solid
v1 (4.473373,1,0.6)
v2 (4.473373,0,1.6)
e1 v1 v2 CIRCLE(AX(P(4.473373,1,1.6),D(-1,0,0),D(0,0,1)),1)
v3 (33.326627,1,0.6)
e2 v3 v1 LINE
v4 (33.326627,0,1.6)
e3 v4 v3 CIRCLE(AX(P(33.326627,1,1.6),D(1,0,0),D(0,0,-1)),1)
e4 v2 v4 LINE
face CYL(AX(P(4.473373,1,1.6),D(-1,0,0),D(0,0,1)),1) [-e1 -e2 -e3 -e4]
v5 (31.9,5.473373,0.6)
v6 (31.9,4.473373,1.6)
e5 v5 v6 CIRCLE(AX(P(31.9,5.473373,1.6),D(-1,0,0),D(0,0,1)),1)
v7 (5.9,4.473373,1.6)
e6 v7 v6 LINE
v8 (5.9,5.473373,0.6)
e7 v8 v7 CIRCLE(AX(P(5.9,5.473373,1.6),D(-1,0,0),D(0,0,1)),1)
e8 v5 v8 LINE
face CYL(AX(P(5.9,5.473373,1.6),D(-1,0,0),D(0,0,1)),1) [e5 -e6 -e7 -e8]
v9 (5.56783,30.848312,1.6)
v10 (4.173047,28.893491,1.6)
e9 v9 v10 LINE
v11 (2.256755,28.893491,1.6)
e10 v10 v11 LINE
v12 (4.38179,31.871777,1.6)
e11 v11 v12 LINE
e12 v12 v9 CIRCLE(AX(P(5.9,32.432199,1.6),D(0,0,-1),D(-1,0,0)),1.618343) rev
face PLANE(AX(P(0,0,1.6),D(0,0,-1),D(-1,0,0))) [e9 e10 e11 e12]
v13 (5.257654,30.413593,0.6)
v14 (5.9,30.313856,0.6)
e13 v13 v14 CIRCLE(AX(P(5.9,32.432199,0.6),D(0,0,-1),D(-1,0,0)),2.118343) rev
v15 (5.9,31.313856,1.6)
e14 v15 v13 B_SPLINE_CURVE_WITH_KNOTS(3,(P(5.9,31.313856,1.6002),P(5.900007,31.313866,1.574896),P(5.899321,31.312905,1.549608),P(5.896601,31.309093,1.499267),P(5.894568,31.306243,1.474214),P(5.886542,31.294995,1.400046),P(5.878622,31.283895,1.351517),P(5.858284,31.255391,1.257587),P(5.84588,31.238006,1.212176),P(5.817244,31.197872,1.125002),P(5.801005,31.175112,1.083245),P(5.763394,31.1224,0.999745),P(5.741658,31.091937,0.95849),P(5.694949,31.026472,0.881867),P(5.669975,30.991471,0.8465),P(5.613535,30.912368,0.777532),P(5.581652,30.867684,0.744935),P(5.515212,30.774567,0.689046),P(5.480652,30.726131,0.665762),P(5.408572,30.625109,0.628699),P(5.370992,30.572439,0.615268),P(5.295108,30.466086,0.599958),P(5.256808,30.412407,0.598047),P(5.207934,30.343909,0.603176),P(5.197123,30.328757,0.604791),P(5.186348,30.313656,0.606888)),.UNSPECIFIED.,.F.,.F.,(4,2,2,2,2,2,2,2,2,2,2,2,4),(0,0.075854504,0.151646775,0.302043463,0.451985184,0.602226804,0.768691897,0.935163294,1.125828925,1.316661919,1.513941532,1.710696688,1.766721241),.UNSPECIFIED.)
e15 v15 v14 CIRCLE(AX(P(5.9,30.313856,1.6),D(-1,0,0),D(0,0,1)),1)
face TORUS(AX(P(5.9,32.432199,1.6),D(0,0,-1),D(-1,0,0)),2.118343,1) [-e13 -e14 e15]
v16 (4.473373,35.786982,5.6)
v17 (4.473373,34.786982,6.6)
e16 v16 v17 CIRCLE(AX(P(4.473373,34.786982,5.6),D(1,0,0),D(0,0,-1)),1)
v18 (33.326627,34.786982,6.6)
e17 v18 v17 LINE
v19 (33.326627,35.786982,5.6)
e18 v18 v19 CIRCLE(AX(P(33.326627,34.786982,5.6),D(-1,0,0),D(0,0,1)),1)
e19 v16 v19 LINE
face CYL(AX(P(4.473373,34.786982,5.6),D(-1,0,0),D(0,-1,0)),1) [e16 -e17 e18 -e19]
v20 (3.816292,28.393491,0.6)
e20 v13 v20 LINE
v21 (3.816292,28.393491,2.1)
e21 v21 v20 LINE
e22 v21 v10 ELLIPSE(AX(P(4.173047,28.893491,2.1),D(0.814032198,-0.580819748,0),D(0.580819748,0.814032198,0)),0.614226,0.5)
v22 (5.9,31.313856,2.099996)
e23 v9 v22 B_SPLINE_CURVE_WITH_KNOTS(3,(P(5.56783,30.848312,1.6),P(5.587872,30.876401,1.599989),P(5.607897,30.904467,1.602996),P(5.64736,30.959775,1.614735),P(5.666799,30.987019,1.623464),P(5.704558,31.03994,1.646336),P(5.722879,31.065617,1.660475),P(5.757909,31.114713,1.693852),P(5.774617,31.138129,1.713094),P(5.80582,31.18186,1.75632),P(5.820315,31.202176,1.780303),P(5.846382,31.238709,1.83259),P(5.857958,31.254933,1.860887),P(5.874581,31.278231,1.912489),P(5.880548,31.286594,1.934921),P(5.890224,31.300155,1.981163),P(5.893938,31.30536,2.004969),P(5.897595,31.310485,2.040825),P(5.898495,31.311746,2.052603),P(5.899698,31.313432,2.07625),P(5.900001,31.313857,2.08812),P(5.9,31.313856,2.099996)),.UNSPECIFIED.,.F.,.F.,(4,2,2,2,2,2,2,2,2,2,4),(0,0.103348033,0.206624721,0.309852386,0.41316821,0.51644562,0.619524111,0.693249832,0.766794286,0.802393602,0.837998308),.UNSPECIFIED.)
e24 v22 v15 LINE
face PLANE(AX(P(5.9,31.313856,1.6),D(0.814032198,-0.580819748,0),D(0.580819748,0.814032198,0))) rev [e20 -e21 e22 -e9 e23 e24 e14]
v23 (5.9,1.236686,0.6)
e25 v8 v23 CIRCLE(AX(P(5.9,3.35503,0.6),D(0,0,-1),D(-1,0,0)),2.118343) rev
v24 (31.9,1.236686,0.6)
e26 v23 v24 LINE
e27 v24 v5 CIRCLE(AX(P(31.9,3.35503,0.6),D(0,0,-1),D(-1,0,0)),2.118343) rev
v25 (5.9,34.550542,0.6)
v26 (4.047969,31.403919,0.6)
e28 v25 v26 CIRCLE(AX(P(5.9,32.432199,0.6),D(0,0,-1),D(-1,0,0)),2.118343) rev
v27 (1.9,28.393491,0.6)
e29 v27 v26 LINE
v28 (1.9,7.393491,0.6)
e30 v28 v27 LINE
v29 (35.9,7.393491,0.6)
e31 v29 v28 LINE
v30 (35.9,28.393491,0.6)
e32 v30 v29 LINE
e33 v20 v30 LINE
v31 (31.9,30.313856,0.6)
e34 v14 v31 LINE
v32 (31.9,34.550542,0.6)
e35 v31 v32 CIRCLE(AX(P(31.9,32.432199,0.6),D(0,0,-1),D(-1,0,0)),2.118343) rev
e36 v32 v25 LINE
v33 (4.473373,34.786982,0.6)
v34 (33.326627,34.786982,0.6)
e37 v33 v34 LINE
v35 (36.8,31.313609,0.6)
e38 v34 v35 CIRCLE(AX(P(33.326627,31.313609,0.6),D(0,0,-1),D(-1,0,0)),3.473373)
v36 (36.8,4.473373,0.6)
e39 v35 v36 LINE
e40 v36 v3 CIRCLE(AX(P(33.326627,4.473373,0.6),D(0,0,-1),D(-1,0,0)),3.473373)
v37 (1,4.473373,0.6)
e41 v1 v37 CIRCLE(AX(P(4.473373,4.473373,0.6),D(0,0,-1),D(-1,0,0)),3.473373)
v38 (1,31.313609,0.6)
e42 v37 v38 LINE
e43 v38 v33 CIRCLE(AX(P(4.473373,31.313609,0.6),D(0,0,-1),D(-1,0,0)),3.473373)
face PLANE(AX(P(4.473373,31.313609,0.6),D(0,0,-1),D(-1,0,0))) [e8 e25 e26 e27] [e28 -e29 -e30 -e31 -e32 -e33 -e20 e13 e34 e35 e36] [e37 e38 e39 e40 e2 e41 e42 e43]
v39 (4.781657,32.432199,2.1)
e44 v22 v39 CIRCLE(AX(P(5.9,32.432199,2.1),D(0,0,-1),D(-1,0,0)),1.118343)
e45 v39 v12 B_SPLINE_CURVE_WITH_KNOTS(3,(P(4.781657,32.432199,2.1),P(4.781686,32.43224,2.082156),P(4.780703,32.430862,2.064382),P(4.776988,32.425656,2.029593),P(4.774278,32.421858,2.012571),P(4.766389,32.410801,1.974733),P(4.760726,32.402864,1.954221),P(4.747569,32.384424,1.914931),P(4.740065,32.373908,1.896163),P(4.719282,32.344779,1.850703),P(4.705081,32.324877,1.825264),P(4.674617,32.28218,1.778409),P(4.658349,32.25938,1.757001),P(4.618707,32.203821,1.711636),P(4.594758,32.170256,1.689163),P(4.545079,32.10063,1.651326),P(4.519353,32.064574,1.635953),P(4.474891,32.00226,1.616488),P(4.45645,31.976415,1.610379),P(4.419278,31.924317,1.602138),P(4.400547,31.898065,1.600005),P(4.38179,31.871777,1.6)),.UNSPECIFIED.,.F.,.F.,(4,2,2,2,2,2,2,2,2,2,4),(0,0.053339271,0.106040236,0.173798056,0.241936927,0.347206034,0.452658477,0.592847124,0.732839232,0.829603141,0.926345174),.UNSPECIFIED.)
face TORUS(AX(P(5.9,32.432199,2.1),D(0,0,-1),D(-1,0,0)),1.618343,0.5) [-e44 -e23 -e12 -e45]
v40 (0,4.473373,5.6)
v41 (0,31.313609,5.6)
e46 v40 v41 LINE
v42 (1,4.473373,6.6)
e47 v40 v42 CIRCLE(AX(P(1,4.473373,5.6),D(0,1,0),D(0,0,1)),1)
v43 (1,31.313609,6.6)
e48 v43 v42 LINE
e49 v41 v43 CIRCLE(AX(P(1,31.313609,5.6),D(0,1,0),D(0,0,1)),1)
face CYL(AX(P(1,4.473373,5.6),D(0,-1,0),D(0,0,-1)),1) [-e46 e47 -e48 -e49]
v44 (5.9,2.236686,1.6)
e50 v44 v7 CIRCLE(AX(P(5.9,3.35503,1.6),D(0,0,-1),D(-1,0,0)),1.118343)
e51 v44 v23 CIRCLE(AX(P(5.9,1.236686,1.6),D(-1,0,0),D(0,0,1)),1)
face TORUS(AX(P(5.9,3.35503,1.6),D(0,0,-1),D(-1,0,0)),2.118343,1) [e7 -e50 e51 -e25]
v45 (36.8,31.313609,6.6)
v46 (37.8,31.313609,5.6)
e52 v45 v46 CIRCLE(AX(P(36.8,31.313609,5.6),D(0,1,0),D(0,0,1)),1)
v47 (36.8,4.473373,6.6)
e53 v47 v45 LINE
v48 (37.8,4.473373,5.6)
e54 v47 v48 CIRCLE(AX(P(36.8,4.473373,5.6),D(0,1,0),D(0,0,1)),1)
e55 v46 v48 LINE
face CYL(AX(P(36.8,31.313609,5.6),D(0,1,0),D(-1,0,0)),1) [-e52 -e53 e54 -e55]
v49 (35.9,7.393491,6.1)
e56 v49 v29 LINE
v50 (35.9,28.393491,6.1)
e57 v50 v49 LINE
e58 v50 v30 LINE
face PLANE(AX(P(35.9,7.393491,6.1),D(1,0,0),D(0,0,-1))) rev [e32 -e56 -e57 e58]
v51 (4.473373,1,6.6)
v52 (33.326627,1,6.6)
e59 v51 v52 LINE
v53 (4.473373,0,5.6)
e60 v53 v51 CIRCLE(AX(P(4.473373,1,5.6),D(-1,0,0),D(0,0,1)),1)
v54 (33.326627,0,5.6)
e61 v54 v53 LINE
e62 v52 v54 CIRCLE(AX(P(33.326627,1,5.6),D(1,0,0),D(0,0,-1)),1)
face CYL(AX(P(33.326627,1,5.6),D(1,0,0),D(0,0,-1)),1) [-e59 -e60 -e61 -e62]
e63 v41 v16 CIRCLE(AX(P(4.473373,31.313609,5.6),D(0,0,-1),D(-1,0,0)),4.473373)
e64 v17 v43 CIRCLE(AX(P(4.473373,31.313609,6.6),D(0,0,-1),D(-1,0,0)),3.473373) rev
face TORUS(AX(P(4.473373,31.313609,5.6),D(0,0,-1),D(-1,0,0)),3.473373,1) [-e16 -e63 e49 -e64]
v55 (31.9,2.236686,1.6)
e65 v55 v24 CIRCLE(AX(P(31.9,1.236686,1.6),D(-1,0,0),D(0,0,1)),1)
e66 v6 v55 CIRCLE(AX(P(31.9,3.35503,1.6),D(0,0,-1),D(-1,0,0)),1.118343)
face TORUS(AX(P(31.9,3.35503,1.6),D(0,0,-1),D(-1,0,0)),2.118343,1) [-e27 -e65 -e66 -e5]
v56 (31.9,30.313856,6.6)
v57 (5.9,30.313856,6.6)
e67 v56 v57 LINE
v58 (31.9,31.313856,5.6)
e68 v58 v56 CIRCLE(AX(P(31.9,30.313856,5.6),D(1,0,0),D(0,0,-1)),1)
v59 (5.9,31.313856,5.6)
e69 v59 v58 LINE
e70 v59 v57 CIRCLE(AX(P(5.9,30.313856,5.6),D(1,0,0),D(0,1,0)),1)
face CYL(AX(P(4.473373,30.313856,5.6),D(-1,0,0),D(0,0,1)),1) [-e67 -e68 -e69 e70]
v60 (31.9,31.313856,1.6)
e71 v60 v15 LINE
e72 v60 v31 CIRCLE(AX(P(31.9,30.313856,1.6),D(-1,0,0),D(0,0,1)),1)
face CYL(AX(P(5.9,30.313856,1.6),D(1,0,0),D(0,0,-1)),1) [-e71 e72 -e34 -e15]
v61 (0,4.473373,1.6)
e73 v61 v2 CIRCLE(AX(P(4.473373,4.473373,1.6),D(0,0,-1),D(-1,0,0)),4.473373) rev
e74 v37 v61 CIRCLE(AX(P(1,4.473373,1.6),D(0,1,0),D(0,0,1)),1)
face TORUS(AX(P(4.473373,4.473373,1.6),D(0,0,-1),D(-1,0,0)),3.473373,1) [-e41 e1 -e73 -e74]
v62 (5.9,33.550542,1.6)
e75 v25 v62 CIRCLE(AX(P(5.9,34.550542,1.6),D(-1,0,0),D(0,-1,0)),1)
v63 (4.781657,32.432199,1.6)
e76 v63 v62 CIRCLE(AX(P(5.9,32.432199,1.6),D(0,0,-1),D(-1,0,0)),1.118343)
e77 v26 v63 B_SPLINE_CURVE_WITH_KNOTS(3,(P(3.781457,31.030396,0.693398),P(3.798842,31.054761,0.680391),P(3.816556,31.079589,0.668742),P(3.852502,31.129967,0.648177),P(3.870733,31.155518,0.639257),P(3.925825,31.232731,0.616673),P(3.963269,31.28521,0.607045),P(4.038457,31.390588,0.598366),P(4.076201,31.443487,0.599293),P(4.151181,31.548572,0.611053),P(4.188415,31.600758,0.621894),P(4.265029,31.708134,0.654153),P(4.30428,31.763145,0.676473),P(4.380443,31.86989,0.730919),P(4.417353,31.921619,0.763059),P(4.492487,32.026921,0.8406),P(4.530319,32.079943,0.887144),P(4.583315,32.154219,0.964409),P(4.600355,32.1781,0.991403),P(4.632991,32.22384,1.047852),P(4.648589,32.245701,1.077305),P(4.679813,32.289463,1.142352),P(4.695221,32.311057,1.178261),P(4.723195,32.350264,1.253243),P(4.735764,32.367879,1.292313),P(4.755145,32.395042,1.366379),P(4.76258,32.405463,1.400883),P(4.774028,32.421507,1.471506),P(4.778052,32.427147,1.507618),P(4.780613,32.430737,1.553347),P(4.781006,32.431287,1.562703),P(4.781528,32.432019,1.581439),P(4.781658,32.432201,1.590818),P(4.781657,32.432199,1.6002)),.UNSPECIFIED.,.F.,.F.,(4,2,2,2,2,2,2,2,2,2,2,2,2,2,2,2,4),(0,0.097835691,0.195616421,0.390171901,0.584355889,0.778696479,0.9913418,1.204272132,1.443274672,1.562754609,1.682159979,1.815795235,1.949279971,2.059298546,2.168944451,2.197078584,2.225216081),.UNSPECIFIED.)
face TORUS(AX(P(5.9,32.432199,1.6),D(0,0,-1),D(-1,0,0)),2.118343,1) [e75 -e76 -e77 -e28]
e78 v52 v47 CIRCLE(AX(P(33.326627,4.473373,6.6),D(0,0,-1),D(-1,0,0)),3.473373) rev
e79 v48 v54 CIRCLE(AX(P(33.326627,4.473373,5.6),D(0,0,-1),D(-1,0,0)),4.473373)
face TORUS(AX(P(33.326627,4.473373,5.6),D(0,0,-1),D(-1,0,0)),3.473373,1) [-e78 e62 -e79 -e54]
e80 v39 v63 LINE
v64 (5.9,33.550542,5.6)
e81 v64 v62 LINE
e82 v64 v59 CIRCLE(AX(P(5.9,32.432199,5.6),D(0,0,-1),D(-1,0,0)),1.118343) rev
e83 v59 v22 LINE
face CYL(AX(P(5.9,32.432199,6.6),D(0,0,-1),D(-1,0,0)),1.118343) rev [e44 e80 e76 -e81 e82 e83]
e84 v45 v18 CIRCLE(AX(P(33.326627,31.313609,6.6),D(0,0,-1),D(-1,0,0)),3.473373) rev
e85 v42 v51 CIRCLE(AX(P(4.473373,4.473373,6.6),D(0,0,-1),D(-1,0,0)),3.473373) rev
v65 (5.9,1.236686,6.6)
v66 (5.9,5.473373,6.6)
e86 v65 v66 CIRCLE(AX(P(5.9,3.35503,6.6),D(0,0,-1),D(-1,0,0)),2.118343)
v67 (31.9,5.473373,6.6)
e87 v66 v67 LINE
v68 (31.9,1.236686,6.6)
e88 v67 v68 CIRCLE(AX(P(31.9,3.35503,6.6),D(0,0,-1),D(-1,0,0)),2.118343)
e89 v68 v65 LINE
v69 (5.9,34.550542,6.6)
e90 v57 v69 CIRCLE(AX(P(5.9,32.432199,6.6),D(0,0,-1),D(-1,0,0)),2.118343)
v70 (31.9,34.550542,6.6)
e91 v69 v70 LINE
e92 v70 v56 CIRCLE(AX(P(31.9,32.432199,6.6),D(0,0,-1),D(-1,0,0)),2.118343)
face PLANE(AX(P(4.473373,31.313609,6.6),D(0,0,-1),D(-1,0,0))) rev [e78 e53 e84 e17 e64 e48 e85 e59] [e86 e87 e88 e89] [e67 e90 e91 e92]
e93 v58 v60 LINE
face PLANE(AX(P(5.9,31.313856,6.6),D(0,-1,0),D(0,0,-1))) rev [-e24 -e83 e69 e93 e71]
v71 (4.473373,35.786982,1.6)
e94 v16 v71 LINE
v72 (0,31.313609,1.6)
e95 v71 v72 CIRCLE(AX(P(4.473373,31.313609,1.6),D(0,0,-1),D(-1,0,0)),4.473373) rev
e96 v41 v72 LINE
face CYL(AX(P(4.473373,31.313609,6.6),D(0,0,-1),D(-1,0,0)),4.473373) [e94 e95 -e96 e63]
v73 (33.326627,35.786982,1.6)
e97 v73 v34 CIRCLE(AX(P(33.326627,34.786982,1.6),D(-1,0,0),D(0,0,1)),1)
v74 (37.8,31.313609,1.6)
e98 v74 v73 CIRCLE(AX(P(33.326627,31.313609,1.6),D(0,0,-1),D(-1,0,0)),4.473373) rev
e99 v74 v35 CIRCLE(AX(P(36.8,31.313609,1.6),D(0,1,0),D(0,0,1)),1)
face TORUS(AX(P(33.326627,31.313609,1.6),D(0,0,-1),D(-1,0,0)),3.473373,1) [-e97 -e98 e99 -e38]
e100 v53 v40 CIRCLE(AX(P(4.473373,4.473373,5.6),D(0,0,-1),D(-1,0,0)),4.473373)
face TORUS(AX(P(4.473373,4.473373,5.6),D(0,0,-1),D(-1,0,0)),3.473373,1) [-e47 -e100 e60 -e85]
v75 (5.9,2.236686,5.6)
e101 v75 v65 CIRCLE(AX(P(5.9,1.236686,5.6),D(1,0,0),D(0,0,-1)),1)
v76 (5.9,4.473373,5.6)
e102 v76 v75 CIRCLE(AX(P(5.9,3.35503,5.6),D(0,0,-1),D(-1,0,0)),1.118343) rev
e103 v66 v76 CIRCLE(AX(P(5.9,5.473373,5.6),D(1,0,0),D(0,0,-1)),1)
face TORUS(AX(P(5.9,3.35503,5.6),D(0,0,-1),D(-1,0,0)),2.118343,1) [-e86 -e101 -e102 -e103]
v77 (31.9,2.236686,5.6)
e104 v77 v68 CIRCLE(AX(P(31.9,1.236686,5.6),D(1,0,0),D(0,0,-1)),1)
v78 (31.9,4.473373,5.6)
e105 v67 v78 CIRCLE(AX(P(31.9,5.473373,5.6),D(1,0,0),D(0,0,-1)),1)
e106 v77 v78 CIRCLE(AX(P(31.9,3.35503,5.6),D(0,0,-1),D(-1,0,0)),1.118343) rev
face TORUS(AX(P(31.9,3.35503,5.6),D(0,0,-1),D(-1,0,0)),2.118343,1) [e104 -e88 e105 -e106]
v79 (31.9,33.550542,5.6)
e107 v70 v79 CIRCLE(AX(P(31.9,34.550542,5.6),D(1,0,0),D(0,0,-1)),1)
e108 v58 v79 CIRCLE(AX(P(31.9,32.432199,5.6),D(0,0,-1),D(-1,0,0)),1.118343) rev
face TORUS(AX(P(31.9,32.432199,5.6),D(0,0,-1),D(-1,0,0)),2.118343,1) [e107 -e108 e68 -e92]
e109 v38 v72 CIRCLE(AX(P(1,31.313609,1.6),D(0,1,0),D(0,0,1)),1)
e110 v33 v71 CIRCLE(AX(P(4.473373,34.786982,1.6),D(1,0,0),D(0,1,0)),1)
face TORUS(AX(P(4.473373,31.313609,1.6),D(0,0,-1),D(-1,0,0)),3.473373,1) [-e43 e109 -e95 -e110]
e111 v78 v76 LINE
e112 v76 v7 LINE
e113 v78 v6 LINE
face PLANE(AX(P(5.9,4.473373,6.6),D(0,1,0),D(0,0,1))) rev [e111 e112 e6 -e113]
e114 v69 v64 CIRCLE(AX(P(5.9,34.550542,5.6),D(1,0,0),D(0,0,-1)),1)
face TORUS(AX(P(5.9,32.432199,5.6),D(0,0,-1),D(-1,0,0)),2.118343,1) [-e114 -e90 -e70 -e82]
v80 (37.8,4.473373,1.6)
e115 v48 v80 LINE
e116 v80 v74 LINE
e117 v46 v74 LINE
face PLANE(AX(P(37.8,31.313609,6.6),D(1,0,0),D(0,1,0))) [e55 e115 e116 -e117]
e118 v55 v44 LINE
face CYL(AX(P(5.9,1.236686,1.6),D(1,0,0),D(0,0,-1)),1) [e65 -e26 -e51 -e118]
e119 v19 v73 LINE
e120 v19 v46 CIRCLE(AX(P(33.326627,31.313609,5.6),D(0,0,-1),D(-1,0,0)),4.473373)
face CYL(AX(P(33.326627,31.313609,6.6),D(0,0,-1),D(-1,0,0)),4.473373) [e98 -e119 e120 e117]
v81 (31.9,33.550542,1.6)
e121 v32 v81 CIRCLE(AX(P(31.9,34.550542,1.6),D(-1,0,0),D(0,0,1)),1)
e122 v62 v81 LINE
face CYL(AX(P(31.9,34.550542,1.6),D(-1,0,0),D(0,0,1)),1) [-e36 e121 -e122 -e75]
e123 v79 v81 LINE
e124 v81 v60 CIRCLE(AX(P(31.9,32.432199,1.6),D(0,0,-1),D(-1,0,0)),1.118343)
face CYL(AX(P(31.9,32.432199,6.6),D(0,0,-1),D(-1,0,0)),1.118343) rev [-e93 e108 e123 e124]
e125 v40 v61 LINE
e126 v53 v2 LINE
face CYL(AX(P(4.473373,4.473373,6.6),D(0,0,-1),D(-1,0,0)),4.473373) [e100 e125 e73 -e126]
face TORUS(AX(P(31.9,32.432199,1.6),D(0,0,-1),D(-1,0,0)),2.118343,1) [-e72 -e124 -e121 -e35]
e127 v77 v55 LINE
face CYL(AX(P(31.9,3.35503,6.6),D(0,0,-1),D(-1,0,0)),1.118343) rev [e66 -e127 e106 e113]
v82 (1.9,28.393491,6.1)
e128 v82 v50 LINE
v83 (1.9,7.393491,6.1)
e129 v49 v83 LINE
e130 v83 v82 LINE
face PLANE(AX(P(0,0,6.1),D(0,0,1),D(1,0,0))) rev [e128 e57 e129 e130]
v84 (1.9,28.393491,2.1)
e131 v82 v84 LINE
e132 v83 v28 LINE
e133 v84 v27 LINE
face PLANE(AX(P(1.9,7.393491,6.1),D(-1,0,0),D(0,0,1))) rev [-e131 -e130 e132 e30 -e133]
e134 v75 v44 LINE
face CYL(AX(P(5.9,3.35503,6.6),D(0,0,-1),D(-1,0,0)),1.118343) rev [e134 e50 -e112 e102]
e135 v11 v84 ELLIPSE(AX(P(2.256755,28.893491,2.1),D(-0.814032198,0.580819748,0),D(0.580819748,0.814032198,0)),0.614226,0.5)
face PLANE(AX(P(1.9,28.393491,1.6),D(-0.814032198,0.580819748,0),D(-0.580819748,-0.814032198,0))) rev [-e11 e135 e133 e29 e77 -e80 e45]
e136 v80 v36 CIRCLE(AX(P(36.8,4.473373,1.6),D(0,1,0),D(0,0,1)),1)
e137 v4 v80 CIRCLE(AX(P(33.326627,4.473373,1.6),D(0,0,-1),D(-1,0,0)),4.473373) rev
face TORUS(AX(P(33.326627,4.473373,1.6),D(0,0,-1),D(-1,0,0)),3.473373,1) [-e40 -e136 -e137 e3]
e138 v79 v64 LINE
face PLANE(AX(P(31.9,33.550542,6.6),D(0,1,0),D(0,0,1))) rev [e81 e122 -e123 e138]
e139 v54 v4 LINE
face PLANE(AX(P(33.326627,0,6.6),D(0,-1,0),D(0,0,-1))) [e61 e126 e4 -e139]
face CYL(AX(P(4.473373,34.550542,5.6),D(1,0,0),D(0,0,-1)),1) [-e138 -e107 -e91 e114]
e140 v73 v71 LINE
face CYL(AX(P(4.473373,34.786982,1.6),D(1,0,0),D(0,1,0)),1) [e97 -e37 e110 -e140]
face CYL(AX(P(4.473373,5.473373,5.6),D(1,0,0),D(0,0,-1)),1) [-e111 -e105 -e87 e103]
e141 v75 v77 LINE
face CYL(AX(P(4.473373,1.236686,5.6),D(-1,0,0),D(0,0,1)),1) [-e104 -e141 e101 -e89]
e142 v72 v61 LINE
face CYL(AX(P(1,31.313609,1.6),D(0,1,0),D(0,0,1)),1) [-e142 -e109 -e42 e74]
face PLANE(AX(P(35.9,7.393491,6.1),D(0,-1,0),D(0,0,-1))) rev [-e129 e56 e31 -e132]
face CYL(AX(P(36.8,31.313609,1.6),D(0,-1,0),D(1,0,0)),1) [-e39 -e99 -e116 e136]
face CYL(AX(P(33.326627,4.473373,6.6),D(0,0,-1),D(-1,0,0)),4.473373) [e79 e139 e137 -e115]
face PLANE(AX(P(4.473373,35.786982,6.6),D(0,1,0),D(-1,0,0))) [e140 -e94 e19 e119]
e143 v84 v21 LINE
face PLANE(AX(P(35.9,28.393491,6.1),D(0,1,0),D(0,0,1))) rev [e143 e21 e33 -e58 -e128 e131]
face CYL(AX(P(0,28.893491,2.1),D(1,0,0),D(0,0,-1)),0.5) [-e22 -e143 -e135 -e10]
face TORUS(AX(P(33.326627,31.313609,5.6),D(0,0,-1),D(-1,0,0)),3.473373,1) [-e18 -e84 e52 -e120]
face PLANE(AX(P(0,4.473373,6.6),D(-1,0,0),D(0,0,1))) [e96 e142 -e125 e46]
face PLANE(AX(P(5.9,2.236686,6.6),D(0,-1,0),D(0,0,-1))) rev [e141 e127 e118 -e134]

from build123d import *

# Parameters (mm, degrees)
BOSS_EXTRUDE1_DEPTH = 6
SKETCH2_W           = 34
SKETCH2_H           = 21
CUT_EXTRUDE1_DEPTH  = 5.5
FILLET1_R           = 1
CUT_EXTRUDE2_DEPTH  = 1
FILLET2_R           = 0.5


with BuildPart() as part:
    # Sketch1 → Boss-Extrude1 (new body)
    with BuildSketch(Plane(origin=(0, 0, 0.6), x_dir=(-1, 0, 0), z_dir=(0, 0, -1))):
        with BuildLine():
            Line((-4.473372781, 35.786982249), (-33.326627219, 35.786982249))
            ThreePointArc((-33.326627219, 35.786982249), (-36.489779447, 34.476761696), (-37.8, 31.313609467))
            Line((-37.8, 31.313609467), (-37.8, 4.473372781))
            ThreePointArc((-37.8, 4.473372781), (-36.489779447, 1.310220553), (-33.326627219, 0))
            Line((-33.326627219, 0), (-4.473372781, 0))
            ThreePointArc((-4.473372781, 0), (-1.310220553, 1.310220553), (0, 4.473372781))
            Line((0, 4.473372781), (0, 31.313609467))
            ThreePointArc((0, 31.313609467), (-1.310220553, 34.476761696), (-4.473372781, 35.786982249))
        make_face()
        with BuildLine():
            Line((-5.9, 4.473372781), (-31.9, 4.473372781))
            ThreePointArc((-31.9, 4.473372781), (-33.018343195, 3.355029586), (-31.9, 2.236686391))
            Line((-31.9, 2.236686391), (-5.9, 2.236686391))
            ThreePointArc((-5.9, 2.236686391), (-4.781656805, 3.355029586), (-5.9, 4.473372781))
        make_face(mode=Mode.SUBTRACT)
        with BuildLine():
            Line((-5.9, 31.31385603), (-31.9, 31.31385603))
            ThreePointArc((-31.9, 31.31385603), (-33.018343195, 32.432199225), (-31.9, 33.550542421))
            Line((-31.9, 33.550542421), (-5.9, 33.550542421))
            ThreePointArc((-5.9, 33.550542421), (-4.781656805, 32.432199225), (-5.9, 31.31385603))
        make_face(mode=Mode.SUBTRACT)
    extrude(amount=-BOSS_EXTRUDE1_DEPTH)

    # Sketch2 → Cut-Extrude1 (cut)
    with BuildSketch(Plane(origin=(0, 0, 0.6), x_dir=(-1, 0, 0), z_dir=(0, 0, -1))):
        with Locations((-18.9, 17.893491124)):
            Rectangle(SKETCH2_W, SKETCH2_H)
    extrude(amount=-CUT_EXTRUDE1_DEPTH, mode=Mode.SUBTRACT)

    # Fillet1
    fillet1_edges = [part.edges().sort_by_distance(p)[0] for p in [
        (36.489779447, 34.476761696, 6.6),
        (18.9, 35.786982249, 0.6),
        (1.310220553, 34.476761696, 0.6),
        (37.8, 17.893491124, 6.6),
        (36.489779447, 1.310220553, 6.6),
        (18.9, 0, 6.6),
        (1.310220553, 1.310220553, 6.6),
        (4.781656805, 3.355029586, 6.6),
        (18.9, 2.236686391, 6.6),
        (33.018343195, 3.355029586, 6.6),
        (18.9, 4.473372781, 6.6),
        (0, 17.893491124, 6.6),
        (4.781656805, 3.355029586, 0.6),
        (18.9, 4.473372781, 0.6),
        (33.018343195, 3.355029586, 0.6),
        (18.9, 2.236686391, 0.6),
        (4.781656805, 32.432199225, 6.6),
        (18.9, 31.31385603, 6.6),
        (33.018343195, 32.432199225, 6.6),
        (18.9, 33.550542421, 6.6),
        (4.781656805, 32.432199225, 0.6),
        (18.9, 33.550542421, 0.6),
        (33.018343195, 32.432199225, 0.6),
        (18.9, 31.31385603, 0.6),
        (1.310220553, 34.476761696, 6.6),
        (18.9, 35.786982249, 6.6),
        (0, 17.893491124, 0.6),
        (1.310220553, 1.310220553, 0.6),
        (18.9, 0, 0.6),
        (36.489779447, 1.310220553, 0.6),
        (37.8, 17.893491124, 0.6),
        (36.489779447, 34.476761696, 0.6),
    ]]
    fillet(fillet1_edges, radius=FILLET1_R)

    # Sketch3 → Cut-Extrude2 (cut)
    with BuildSketch(Plane(origin=(0, 0, 0.6), x_dir=(-1, 0, 0), z_dir=(0, 0, -1))):
        Polygon((-1.9, 28.393491124), (-4.781656805, 32.432199225), (-5.9, 31.31385603), (-3.816291747, 28.393491124), align=None)
    extrude(amount=-CUT_EXTRUDE2_DEPTH, mode=Mode.SUBTRACT)

    # Fillet2
    # the kernel refuses this fillet: 0.5 mm, written as the material it takes off along each edge
    with BuildSketch(Plane(origin=(5.066291747, 28.393491124, 1.6), x_dir=(0, 0, 1), z_dir=(-1, 0, 0))) as fillet2_piece_1_section:
        with BuildLine():
            CenterArc((FILLET2_R, FILLET2_R), FILLET2_R, 180, 90)
            Line((0, FILLET2_R), (0, 0))
            Line((0, 0), (FILLET2_R, 0))
        make_face()
    fillet2_piece_1 = extrude(amount=4.416291747, mode=Mode.PRIVATE)
    fillet2_piece_1 = split(fillet2_piece_1, bisect_by=Plane(origin=(2.302919603, 28.958192189, 1.711683969), z_dir=(0.8140321982584601, -0.5808197484577287, 0)), keep=Keep.TOP, mode=Mode.PRIVATE)
    fillet2_piece_1 = split(fillet2_piece_1, bisect_by=Plane(origin=(3.572747301, 28.052157998, 1.711683969), z_dir=(-0.8140321982584605, 0.5808197484577283, 0)), keep=Keep.TOP, mode=Mode.PRIVATE)
    add(fillet2_piece_1, mode=Mode.SUBTRACT)
    with BuildSketch(Plane(origin=(5.9, 32.432199225, 1.6), x_dir=(-0.4373254221081723, 0.8993033276808826, 0), z_dir=(0.8993033276808826, 0.4373254221081723, 0))) as fillet2_piece_2_section:
        with BuildLine():
            CenterArc((1.118343195 + FILLET2_R, FILLET2_R), FILLET2_R, 180, 90)
            Line((1.118343195, FILLET2_R), (1.118343195, 0))
            Line((1.118343195, 0), (1.118343195 + FILLET2_R, 0))
        make_face()
    fillet2_piece_2 = revolve(axis=Axis((5.9, 32.432199225, 1.6), (0, 0, 1)), revolution_arc=218.133286673, mode=Mode.PRIVATE)
    fillet2_piece_2 = split(fillet2_piece_2, bisect_by=Plane(origin=(4.510634251, 32.0523549, 1.691521123), z_dir=(0.8140321982584601, -0.5808197484577287, 0)), keep=Keep.TOP, mode=Mode.PRIVATE)
    fillet2_piece_2 = split(fillet2_piece_2, bisect_by=Plane(origin=(5.780461948, 31.146320709, 1.691521123), z_dir=(-0.8140321982584605, 0.5808197484577283, 0)), keep=Keep.TOP, mode=Mode.PRIVATE)
    add(fillet2_piece_2, mode=Mode.SUBTRACT)


solid = part.part
